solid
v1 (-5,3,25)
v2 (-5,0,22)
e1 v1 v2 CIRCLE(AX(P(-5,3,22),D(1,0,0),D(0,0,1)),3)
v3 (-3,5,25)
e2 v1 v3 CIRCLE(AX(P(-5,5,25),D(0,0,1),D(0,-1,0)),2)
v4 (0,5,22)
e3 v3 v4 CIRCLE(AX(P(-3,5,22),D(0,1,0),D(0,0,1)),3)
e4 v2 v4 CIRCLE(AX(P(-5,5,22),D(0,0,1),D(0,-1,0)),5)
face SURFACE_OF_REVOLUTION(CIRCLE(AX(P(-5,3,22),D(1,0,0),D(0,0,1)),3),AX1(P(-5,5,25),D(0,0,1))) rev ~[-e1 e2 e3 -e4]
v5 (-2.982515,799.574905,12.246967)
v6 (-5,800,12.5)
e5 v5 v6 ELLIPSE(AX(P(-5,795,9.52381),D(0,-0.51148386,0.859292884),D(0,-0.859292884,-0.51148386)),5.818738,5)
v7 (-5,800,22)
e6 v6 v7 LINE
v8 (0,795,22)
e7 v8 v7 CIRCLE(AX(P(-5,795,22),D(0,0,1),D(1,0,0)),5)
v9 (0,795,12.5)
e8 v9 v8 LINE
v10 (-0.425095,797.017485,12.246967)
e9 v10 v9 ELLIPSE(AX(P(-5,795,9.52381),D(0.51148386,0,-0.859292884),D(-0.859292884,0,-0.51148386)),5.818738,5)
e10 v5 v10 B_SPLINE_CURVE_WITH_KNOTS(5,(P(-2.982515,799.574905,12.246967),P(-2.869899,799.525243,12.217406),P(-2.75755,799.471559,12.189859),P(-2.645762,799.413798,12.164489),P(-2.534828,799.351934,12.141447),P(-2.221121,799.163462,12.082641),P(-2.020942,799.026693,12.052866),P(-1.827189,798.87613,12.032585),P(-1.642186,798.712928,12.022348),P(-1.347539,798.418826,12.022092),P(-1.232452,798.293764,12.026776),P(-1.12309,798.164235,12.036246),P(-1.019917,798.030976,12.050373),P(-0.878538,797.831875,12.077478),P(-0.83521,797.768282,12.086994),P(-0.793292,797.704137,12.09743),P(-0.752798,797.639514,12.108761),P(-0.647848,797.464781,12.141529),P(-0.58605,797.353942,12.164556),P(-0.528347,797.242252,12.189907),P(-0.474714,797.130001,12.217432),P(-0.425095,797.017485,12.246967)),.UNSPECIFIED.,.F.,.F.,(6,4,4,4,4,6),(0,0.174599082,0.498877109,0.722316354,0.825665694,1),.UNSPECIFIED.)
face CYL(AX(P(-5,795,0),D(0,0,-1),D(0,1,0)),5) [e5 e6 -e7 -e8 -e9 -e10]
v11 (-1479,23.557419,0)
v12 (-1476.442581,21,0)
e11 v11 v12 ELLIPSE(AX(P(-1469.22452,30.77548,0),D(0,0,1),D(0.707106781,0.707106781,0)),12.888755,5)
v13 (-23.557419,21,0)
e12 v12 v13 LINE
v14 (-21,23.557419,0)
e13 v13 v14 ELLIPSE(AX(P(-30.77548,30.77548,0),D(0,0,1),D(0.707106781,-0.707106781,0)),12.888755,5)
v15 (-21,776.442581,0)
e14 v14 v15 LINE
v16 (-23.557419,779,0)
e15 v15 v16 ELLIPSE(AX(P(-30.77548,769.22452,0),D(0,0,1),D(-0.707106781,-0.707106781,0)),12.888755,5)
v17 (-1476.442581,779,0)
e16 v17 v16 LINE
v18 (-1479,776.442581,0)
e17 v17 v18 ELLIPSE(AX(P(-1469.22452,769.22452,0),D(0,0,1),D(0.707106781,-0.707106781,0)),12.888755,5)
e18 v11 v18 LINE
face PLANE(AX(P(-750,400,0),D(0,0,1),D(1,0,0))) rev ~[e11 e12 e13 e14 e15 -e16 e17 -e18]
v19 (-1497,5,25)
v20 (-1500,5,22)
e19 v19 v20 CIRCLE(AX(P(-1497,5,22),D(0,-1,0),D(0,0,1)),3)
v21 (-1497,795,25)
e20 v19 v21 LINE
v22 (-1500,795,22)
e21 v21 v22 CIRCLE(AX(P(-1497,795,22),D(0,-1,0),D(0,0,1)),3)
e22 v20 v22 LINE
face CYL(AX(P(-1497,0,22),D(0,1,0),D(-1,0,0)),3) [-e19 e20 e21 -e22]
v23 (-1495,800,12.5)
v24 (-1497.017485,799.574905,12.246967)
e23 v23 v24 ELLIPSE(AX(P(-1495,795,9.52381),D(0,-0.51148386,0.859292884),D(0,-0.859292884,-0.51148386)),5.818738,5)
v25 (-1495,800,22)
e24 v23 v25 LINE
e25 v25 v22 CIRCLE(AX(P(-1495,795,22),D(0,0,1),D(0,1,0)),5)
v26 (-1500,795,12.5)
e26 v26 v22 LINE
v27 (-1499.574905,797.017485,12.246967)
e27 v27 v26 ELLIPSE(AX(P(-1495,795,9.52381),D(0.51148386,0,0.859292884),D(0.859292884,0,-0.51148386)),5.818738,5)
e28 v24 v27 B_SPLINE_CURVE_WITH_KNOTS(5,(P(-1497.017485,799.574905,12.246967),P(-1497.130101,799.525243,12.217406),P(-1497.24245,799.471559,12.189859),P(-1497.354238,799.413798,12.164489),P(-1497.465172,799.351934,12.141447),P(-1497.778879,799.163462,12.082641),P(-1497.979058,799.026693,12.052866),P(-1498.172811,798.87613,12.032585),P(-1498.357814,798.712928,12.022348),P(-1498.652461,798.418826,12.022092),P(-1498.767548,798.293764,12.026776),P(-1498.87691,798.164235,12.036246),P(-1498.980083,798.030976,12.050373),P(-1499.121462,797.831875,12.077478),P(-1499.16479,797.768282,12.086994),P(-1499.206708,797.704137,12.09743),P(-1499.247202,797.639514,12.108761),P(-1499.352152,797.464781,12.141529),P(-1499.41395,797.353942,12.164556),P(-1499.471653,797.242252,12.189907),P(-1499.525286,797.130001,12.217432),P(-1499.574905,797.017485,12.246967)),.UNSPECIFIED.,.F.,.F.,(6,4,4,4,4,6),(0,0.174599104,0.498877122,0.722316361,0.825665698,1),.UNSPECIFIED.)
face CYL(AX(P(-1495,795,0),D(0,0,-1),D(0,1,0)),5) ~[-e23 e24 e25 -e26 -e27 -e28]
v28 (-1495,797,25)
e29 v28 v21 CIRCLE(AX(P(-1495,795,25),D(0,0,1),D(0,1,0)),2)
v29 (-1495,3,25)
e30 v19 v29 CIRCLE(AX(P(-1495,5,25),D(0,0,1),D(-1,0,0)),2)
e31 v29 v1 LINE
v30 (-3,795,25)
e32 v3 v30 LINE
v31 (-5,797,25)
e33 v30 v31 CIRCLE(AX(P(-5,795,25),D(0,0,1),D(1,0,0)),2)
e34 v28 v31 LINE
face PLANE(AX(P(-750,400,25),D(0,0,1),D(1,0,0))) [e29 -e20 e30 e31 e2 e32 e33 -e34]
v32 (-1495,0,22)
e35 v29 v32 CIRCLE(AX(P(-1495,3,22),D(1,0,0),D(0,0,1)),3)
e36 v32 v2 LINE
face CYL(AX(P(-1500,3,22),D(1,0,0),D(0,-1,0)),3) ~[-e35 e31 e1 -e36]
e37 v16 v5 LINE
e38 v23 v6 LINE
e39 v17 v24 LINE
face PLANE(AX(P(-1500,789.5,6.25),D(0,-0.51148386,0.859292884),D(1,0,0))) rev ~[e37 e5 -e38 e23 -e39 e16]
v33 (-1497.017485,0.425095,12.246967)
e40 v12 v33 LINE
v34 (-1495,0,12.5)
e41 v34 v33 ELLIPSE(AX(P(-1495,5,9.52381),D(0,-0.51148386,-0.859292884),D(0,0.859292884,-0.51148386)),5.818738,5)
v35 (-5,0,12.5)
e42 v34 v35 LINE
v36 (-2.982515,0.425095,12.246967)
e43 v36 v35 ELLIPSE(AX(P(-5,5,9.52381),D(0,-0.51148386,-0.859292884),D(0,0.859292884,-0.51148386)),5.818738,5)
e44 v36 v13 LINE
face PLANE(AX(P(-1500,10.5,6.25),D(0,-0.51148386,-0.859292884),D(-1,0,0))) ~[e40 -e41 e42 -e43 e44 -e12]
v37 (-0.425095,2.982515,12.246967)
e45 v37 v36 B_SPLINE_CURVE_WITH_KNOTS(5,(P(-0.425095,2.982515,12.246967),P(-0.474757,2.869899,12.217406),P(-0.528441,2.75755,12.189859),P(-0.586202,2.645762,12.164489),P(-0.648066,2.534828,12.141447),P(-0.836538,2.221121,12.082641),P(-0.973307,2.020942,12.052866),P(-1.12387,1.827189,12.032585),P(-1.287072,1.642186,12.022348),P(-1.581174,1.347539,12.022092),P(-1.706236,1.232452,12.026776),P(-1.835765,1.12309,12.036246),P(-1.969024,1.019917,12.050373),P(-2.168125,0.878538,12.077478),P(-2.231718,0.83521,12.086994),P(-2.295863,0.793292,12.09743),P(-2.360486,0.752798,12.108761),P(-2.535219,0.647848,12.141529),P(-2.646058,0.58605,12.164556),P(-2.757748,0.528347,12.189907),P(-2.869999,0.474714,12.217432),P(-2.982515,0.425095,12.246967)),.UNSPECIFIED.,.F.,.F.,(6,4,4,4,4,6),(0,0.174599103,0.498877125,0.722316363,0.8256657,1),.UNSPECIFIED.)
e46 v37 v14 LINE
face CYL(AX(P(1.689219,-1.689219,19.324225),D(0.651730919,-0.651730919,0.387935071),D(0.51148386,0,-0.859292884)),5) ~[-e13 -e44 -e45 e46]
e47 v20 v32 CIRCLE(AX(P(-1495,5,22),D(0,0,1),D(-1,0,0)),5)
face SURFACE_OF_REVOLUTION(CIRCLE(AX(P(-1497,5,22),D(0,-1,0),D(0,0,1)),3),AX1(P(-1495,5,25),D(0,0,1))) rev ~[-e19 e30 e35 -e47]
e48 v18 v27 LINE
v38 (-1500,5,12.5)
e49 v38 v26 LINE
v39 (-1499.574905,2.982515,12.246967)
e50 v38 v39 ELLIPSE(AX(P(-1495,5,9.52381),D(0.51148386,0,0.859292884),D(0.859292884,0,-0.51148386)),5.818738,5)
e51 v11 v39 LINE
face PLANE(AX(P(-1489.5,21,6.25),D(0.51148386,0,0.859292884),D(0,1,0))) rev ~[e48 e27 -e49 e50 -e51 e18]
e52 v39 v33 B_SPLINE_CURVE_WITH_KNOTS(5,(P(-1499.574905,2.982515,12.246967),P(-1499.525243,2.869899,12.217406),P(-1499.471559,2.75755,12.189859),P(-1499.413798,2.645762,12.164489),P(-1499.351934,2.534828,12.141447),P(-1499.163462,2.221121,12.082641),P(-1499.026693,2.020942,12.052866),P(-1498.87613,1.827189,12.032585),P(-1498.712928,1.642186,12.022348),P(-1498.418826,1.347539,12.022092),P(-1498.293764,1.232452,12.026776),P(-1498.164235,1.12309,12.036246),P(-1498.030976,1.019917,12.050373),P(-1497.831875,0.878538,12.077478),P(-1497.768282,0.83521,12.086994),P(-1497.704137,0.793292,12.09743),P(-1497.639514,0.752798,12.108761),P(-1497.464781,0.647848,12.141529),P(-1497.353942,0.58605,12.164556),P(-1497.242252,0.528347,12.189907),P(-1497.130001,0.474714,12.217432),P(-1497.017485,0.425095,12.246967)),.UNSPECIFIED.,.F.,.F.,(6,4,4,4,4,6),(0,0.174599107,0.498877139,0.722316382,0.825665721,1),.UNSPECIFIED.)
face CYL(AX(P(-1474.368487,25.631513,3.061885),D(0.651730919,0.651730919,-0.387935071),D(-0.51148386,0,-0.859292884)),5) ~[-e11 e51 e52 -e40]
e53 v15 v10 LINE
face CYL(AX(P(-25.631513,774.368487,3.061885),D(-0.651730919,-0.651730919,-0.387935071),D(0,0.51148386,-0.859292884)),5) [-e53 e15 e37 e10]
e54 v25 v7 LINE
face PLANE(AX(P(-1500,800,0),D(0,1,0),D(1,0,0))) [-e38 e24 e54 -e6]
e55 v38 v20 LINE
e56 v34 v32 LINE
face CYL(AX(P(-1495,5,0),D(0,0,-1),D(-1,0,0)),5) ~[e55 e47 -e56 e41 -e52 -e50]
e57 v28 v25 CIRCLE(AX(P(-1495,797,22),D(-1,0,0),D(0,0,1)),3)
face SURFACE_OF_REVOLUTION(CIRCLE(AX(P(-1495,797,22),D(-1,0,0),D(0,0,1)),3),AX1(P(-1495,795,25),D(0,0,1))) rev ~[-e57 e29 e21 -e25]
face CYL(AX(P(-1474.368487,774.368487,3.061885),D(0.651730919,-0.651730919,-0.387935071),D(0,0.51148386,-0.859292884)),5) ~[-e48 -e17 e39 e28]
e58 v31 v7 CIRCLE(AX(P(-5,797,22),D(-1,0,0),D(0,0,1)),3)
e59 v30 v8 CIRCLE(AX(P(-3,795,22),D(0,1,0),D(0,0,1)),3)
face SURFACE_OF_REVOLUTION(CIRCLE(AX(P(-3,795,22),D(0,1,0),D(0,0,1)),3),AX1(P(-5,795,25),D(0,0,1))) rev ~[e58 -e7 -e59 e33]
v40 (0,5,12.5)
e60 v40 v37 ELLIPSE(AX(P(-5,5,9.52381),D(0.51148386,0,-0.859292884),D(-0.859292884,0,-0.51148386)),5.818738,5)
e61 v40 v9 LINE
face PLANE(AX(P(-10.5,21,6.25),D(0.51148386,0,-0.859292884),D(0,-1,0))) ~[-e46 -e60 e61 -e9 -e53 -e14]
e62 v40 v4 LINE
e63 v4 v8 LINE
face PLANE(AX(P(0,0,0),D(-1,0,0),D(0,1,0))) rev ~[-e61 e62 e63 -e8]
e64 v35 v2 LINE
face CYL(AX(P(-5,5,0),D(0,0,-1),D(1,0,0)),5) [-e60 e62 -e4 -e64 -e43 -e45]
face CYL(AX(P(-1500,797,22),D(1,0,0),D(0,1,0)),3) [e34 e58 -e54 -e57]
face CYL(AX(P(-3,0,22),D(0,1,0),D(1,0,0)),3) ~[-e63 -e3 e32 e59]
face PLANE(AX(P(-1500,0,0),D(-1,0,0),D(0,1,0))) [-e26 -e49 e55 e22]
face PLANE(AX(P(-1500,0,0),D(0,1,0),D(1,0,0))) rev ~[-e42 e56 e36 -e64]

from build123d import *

# Parameters (mm, degrees)
F0_W         = 1500
F0_H         = 800
F1_DEPTH     = 25
F2_C1_SIZE2  = 21
F2_C1_SIZE   = 12.5
F2_C2_SIZE2  = 21
F2_C2_SIZE   = 12.5
F2_C3_SIZE2  = 12.5
F2_C3_SIZE   = 21
F2_C4_SIZE2  = 12.5
F2_C4_SIZE   = 21
F3_R         = 3
F4_T1_DEPTH  = 25
F4_T3_DEPTH  = 41.9202637387
F4_T5_DEPTH  = 41.9202637387
F4_T7_DEPTH  = 41.9202637387
F4_T9_DEPTH  = 41.9202637387
F4_T12_ANGLE = 90
F4_T14_ANGLE = 90
F4_T16_ANGLE = 90
F4_T18_ANGLE = 90


# Not quite as in the source:
# - a fillet or chamfer that OpenCascade refuses, or shapes differently, is made with other operations: its cross-section is extruded or revolved along the edge and cut away or added


with BuildPart() as f1:
    # F0 (on Top) → F1 (new body)
    with BuildSketch(Plane.XY):
        with Locations((-750, 400)):
            Rectangle(F0_W, F0_H)
    extrude(amount=F1_DEPTH)

    # F2: chamfer of 21 x 12.5 on 4 edges, made by hand

    # F2_c1
    f2_c1_edges = [f1.edges().sort_by_distance(p)[0] for p in [
        (-750, 0, 0),
    ]]
    f2_c1_side = f1.faces().sort_by_distance((-750, 0, 0.25))[0]
    chamfer(f2_c1_edges, length=F2_C1_SIZE, length2=F2_C1_SIZE2, reference=f2_c1_side)

    # F2_c2
    f2_c2_edges = [f1.edges().sort_by_distance(p)[0] for p in [
        (0, 410.5, 0),
    ]]
    f2_c2_side = f1.faces().sort_by_distance((0, 410.5, 0.25))[0]
    chamfer(f2_c2_edges, length=F2_C2_SIZE, length2=F2_C2_SIZE2, reference=f2_c2_side)

    # F2_c3
    f2_c3_edges = [f1.edges().sort_by_distance(p)[0] for p in [
        (-760.5, 800, 0),
    ]]
    f2_c3_side = f1.faces().sort_by_distance((-760.5, 799.75, 0))[0]
    chamfer(f2_c3_edges, length=F2_C3_SIZE, length2=F2_C3_SIZE2, reference=f2_c3_side)

    # F2_c4
    f2_c4_edges = [f1.edges().sort_by_distance(p)[0] for p in [
        (-1500, 400, 0),
    ]]
    f2_c4_side = f1.faces().sort_by_distance((-1499.75, 400, 0))[0]
    chamfer(f2_c4_edges, length=F2_C4_SIZE, length2=F2_C4_SIZE2, reference=f2_c4_side)

    # F3
    f3_edges = [f1.edges().sort_by_distance(p)[0] for p in [
        (-750, 0, 25),
        (0, 400, 25),
        (-750, 800, 25),
        (-1500, 400, 25),
    ]]
    fillet(f3_edges, radius=F3_R)

    # F4: fillet of radius 5 on 8 edges, made by hand

    # F4_s2 → F4_t1 (cut)
    with BuildSketch(Plane.XY):
        with BuildLine():
            ThreePointArc((-1500, 5), (-1498.5355339059, 1.4644660941), (-1495, 0))
            Line((-1495, 0), (-1500, 0))
            Line((-1500, 0), (-1500, 5))
        make_face()
        with BuildLine():
            ThreePointArc((-1495, 800), (-1498.5355339059, 798.5355339059), (-1500, 795))
            Line((-1500, 795), (-1500, 800))
            Line((-1500, 800), (-1495, 800))
        make_face()
        with BuildLine():
            ThreePointArc((-5, 800), (-1.4644660941, 798.5355339059), (0, 795))
            Line((0, 795), (0, 800))
            Line((0, 800), (-5, 800))
        make_face()
        with BuildLine():
            ThreePointArc((0, 5), (-1.4644660941, 1.4644660941), (-5, 0))
            Line((-5, 0), (0, 0))
            Line((0, 0), (0, 5))
        make_face()
    extrude(amount=F4_T1_DEPTH, mode=Mode.SUBTRACT)

    # F4_s4 → F4_t3 (cut)
    with BuildSketch(Plane(origin=(-616.1297856971, -616.1297856971, 366.7439200578), x_dir=(0.7071067812, -0.7071067812, 0), z_dir=(-0.6517309188, -0.6517309188, 0.3879350707))):
        with BuildLine():
            ThreePointArc((-1062.4685403084, -399.2446653395), (-1060.6601717798, -399.5831416331), (-1058.8518032513, -399.2446653395))
            Line((-1058.8518032513, -399.2446653395), (-1060.6601717798, -399.9461949124))
            Line((-1060.6601717798, -399.9461949124), (-1062.4685403084, -399.2446653395))
        make_face()
    extrude(amount=F4_T3_DEPTH, mode=Mode.SUBTRACT)

    # F4_s6 → F4_t5 (cut)
    with BuildSketch(Plane(origin=(-955.9323380689, 955.9323380689, 569.0073440886), x_dir=(-0.7071067812, -0.7071067812, 0), z_dir=(-0.6517309188, 0.6517309188, 0.3879350707))):
        with BuildLine():
            ThreePointArc((493.166378302, -618.693880655), (494.9747468306, -619.0323569486), (496.7831153591, -618.693880655))
            Line((496.7831153591, -618.693880655), (494.9747468306, -619.3954102279))
            Line((494.9747468306, -619.3954102279), (493.166378302, -618.693880655))
        make_face()
    extrude(amount=F4_T5_DEPTH, mode=Mode.SUBTRACT)

    # F4_s8 → F4_t7 (cut)
    with BuildSketch(Plane(origin=(318.8025523718, 318.8025523718, 189.7634240308), x_dir=(-0.7071067812, 0.7071067812, 0), z_dir=(0.6517309188, 0.6517309188, 0.3879350707))):
        with BuildLine():
            ThreePointArc((567.4937934778, -207.2266019385), (565.6854249492, -207.5650782321), (563.8770564207, -207.2266019385))
            Line((563.8770564207, -207.2266019385), (565.6854249492, -207.9281315114))
            Line((565.6854249492, -207.9281315114), (567.4937934778, -207.2266019385))
        make_face()
    extrude(amount=F4_T7_DEPTH, mode=Mode.SUBTRACT)

    # F4_s10 → F4_t9 (cut)
    with BuildSketch(Plane(origin=(6.320732001, -6.320732001, 3.7623404768), x_dir=(-0.7071067812, -0.7071067812, 0), z_dir=(-0.6517309188, 0.6517309188, -0.3879350707))):
        with BuildLine():
            ThreePointArc((-1.8083685285, 12.222613377), (0, 11.8841370834), (1.8083685285, 12.222613377))
            Line((1.8083685285, 12.222613377), (0, 11.5210838041))
            Line((0, 11.5210838041), (-1.8083685285, 12.222613377))
        make_face()
    extrude(amount=F4_T9_DEPTH, mode=Mode.SUBTRACT)

    # F4_s11 → F4_t12 (revolve, cut)
    with BuildSketch(Plane.YZ.offset(-5)):
        with BuildLine():
            ThreePointArc((3, 25), (0.8786796564, 24.1213203436), (0, 22))
            Line((0, 22), (0, 25))
            Line((0, 25), (3, 25))
        make_face()
    revolve(axis=Axis((-5, 5, 25), (0, 0, 1)), revolution_arc=F4_T12_ANGLE, mode=Mode.SUBTRACT)

    # F4_s13 → F4_t14 (revolve, cut)
    with BuildSketch(Plane.XZ.offset(-795)):
        with BuildLine():
            ThreePointArc((-3, 25), (-0.8786796564, 24.1213203436), (0, 22))
            Line((0, 22), (0, 25))
            Line((0, 25), (-3, 25))
        make_face()
    revolve(axis=Axis((-5, 795, 25), (0, 0, 1)), revolution_arc=F4_T14_ANGLE, mode=Mode.SUBTRACT)

    # F4_s15 → F4_t16 (revolve, cut)
    with BuildSketch(Plane.YZ.offset(-1495)):
        with BuildLine():
            ThreePointArc((797, 25), (799.1213203436, 24.1213203436), (800, 22))
            Line((800, 22), (800, 25))
            Line((800, 25), (797, 25))
        make_face()
    revolve(axis=Axis((-1495, 795, 25), (0, 0, 1)), revolution_arc=F4_T16_ANGLE, mode=Mode.SUBTRACT)

    # F4_s17 → F4_t18 (revolve, cut)
    with BuildSketch(Plane.XZ.offset(-5)):
        with BuildLine():
            ThreePointArc((-1497, 25), (-1499.1213203436, 24.1213203436), (-1500, 22))
            Line((-1500, 22), (-1500, 25))
            Line((-1500, 25), (-1497, 25))
        make_face()
    revolve(axis=Axis((-1495, 5, 25), (0, 0, 1)), revolution_arc=F4_T18_ANGLE, mode=Mode.SUBTRACT)


solid = f1.part
